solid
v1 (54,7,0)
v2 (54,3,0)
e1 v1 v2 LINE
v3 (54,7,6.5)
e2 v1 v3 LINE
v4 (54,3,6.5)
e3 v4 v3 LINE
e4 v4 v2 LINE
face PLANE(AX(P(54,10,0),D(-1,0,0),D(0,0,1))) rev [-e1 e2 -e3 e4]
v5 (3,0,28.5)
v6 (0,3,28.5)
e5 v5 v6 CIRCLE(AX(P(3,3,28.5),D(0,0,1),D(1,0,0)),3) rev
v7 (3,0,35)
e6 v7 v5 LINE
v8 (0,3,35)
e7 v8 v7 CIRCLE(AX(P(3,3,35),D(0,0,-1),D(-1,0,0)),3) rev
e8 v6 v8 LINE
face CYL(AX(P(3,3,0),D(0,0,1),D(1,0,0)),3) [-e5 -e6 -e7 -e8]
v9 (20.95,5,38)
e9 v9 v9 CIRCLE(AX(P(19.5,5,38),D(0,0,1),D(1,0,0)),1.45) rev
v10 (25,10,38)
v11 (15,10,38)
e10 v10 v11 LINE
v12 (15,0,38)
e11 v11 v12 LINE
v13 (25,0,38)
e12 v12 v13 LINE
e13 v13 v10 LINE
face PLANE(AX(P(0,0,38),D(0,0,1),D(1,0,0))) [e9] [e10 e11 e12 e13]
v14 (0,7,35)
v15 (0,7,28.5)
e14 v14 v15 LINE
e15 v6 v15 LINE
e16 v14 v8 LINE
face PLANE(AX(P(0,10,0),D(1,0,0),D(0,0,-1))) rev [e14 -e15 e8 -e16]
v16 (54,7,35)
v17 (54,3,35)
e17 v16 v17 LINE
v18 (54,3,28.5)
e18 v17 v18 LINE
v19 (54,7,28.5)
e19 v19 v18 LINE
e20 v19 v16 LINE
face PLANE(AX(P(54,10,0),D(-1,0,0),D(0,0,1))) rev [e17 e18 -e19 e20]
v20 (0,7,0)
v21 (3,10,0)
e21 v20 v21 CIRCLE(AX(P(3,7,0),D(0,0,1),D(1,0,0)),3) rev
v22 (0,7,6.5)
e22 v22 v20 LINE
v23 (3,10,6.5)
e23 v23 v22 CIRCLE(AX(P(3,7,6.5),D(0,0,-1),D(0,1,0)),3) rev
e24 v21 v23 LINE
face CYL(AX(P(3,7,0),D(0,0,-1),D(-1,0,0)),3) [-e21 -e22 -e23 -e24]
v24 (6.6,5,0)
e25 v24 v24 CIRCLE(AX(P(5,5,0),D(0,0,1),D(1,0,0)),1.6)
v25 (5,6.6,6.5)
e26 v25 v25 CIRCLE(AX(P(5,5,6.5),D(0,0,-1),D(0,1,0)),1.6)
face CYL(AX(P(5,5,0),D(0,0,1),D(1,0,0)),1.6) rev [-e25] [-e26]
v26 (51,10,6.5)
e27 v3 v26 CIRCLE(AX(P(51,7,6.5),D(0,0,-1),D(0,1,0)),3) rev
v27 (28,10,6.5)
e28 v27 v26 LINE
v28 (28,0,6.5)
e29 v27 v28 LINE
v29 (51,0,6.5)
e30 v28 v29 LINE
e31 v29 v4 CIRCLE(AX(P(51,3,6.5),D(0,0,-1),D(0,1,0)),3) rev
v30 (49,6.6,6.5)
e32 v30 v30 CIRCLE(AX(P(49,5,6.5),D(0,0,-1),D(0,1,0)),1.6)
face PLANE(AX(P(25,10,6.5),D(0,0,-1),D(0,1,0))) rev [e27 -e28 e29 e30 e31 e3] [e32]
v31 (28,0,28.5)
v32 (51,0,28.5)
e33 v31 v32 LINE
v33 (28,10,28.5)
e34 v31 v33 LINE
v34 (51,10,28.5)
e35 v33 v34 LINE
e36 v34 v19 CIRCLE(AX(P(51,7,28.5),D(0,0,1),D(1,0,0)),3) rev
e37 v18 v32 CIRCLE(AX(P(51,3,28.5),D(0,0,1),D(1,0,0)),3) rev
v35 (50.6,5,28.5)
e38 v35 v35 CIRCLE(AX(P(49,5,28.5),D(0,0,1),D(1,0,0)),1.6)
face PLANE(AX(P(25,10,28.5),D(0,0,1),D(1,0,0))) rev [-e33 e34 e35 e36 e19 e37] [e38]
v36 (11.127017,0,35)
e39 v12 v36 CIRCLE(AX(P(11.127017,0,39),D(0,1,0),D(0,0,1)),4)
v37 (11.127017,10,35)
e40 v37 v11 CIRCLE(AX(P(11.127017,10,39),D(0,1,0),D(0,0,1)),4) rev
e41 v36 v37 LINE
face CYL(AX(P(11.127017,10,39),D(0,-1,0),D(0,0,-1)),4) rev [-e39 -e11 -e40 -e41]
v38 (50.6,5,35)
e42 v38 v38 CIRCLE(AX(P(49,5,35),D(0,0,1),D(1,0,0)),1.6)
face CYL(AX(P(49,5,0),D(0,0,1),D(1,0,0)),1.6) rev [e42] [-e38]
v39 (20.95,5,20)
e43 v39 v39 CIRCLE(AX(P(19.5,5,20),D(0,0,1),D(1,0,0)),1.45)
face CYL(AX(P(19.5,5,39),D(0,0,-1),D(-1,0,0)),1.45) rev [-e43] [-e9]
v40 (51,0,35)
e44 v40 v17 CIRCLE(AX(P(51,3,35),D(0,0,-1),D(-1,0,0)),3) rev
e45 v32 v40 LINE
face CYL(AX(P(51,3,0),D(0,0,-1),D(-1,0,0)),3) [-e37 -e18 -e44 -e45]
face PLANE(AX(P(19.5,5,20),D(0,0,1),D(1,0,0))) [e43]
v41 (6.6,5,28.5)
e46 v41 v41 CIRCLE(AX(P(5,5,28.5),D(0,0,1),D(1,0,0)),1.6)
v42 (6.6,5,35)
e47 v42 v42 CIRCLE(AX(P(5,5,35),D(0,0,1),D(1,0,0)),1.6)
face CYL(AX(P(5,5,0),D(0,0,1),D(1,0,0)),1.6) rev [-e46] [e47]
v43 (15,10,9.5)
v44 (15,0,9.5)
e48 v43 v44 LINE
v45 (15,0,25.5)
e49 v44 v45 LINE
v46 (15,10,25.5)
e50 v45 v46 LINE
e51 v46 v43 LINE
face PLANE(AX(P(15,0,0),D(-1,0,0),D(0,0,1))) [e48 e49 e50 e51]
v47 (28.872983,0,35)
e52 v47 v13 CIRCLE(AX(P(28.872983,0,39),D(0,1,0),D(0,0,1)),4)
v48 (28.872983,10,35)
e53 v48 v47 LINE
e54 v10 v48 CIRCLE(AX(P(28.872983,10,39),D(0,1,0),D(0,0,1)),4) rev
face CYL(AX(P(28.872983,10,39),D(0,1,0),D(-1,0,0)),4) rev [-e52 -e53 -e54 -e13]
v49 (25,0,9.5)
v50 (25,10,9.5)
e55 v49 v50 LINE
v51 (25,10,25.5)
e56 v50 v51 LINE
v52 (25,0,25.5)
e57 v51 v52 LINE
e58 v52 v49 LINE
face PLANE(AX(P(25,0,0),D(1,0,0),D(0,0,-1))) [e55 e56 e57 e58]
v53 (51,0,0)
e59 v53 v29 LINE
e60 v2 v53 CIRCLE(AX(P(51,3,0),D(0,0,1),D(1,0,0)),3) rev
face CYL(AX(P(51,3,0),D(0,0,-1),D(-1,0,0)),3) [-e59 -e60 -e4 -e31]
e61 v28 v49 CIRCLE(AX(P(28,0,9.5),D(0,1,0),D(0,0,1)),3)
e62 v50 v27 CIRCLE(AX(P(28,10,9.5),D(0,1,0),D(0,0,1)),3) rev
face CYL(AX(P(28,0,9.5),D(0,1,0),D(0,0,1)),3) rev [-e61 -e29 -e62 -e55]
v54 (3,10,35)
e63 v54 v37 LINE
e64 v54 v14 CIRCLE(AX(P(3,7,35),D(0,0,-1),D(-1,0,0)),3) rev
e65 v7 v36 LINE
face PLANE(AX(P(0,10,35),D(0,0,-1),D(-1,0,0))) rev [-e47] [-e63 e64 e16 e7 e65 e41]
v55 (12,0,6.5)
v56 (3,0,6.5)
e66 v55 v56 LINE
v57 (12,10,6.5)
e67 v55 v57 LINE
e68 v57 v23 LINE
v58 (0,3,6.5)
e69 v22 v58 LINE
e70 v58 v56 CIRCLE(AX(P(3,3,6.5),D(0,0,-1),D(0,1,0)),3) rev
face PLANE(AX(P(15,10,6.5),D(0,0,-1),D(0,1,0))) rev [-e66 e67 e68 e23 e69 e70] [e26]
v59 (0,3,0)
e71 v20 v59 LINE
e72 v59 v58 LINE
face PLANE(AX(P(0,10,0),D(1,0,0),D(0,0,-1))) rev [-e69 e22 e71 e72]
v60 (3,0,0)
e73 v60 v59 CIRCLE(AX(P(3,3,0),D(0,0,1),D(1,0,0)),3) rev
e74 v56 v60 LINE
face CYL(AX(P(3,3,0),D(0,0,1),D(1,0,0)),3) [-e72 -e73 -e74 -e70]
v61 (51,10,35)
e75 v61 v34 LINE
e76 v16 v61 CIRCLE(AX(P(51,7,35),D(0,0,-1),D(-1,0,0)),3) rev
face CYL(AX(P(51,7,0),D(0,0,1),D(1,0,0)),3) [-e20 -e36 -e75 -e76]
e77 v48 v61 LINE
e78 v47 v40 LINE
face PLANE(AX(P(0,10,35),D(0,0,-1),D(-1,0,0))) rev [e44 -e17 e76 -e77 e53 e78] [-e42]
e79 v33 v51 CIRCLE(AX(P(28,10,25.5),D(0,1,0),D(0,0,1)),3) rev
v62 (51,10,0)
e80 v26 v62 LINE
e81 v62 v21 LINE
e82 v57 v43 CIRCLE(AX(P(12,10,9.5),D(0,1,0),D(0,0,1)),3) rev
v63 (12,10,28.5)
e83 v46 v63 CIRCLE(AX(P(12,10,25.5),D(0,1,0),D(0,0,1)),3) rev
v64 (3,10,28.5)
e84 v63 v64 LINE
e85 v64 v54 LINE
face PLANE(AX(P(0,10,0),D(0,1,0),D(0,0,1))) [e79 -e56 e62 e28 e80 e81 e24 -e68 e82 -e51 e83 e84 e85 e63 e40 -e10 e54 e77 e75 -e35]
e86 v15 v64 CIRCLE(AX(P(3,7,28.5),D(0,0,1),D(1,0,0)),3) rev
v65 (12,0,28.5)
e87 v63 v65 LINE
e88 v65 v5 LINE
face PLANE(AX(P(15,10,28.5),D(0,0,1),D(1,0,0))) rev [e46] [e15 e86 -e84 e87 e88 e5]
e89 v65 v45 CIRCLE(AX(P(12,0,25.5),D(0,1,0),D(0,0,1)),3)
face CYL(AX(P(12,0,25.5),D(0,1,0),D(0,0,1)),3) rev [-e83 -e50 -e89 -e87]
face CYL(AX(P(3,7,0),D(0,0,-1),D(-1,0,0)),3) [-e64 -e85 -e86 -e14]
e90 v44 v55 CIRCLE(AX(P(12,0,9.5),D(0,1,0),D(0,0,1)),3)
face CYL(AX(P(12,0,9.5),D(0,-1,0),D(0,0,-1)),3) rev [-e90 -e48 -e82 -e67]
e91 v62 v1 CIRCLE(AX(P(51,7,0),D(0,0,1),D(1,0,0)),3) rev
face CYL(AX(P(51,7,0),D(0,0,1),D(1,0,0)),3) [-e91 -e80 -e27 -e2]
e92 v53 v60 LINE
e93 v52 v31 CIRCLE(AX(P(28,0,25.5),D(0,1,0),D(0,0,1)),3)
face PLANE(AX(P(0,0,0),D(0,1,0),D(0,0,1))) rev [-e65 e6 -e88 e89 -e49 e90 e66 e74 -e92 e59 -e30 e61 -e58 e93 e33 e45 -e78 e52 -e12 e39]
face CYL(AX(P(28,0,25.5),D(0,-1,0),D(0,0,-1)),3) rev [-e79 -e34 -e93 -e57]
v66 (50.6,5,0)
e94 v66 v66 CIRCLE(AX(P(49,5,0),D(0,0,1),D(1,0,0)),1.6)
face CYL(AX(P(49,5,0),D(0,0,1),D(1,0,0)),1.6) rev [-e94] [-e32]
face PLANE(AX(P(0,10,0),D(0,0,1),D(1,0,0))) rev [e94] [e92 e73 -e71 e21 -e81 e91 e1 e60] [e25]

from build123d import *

# Parameters (mm, degrees)
SKETCH1_W               = 54
SKETCH1_H               = 35
BOSS_EXTRUDE1_DEPTH     = 10
SKETCH2_W               = 22
SKETCH2_H               = 10
CUT_EXTRUDE1_DEPTH      = 29
SKETCH3_W               = 22
SKETCH3_H               = 10
CUT_EXTRUDE2_DEPTH      = 15
SKETCH5_R               = 1.6
CUT_EXTRUDE4_DEPTH      = 66.122960621
FILLET1_R               = 3
FILLET2_R               = 3
SKETCH8_W               = 10
SKETCH8_H               = 10
BOSS_EXTRUDE2_DEPTH     = 3
CUT_EXTRUDE5_DEPTH      = 4
CUT_EXTRUDE5_DEPTH_BACK = 15
SKETCH6_R               = 1.45
FILLET3_R               = 4


with BuildPart() as part:
    # Sketch1 → Boss-Extrude1 (new body)
    with BuildSketch(Plane(origin=(0, 0, 0), x_dir=(1, 0, 0), z_dir=(0, 1, 0))):
        with Locations((27, -17.5)):
            Rectangle(SKETCH1_W, SKETCH1_H)
    extrude(amount=BOSS_EXTRUDE1_DEPTH)

    # Sketch2 → Cut-Extrude1 (cut)
    with BuildSketch(Plane(origin=(54, 0, 0), x_dir=(0, 0, -1), z_dir=(1, 0, 0))):
        with Locations((-17.5, 5)):
            Rectangle(SKETCH2_W, SKETCH2_H)
    extrude(amount=-CUT_EXTRUDE1_DEPTH, mode=Mode.SUBTRACT)

    # Sketch3 → Cut-Extrude2 (cut)
    with BuildSketch(Plane.ZY):
        with Locations((17.5, 5)):
            Rectangle(SKETCH3_W, SKETCH3_H)
    extrude(amount=-CUT_EXTRUDE2_DEPTH, mode=Mode.SUBTRACT)

    # Sketch5 → Cut-Extrude4 (cut, through all)
    with BuildSketch(Plane.XY.offset(35)):
        with Locations((5, 5)):
            Circle(SKETCH5_R)
        with Locations((49, 5)):
            Circle(SKETCH5_R)
    extrude(amount=-CUT_EXTRUDE4_DEPTH, mode=Mode.SUBTRACT)

    # Fillet1
    fillet1_edges = [part.edges().sort_by_distance(p)[0] for p in [
        (54, 10, 31.75),
        (54, 0, 3.25),
        (54, 10, 3.25),
        (0, 0, 31.75),
        (0, 10, 31.75),
        (0, 10, 3.25),
        (54, 0, 31.75),
        (0, 0, 3.25),
    ]]
    fillet(fillet1_edges, radius=FILLET1_R)

    # Fillet2
    fillet2_edges = [part.edges().sort_by_distance(p)[0] for p in [
        (25, 5, 28.5),
        (25, 5, 6.5),
        (15, 5, 6.5),
        (15, 5, 28.5),
    ]]
    fillet(fillet2_edges, radius=FILLET2_R)

    # Sketch8 → Boss-Extrude2 (add)
    with BuildSketch(Plane.XY.offset(35)):
        with Locations((20, 5)):
            Rectangle(SKETCH8_W, SKETCH8_H)
    extrude(amount=BOSS_EXTRUDE2_DEPTH)

    # Sketch6 → Cut-Extrude5 (cut, two sides: drawn at the far end of the back side and taken through both)
    with BuildSketch(Plane.XY.offset(35).offset(-CUT_EXTRUDE5_DEPTH_BACK)):
        with Locations((19.5, 5)):
            Circle(SKETCH6_R)
    extrude(amount=CUT_EXTRUDE5_DEPTH + CUT_EXTRUDE5_DEPTH_BACK, mode=Mode.SUBTRACT)

    # Fillet3
    # the kernel refuses this fillet: 4 mm, written as the material it adds along each edge
    with BuildSketch(Plane(origin=(25, 10, 35), x_dir=(0, 0, 1), z_dir=(0, -1, 0))) as fillet3_piece_1:
        with BuildLine():
            CenterArc((4, -3.872983346), FILLET3_R, 104.477512186, 75.522487814)
            Line((0, -3.872983346), (-0.08, -3.872983346))
            Line((-0.08, -3.872983346), (-0.08, 0))
            Line((-0.08, 0), (0, 0.08))
            ThreePointArc((0, 0.08), (1.5, 0.08), (2.98, 0.077459667))
            Line((2.98, 0.077459667), (3, 0))
        make_face()
    extrude(amount=10)
    with BuildSketch(Plane(origin=(15, 0, 35), x_dir=(-1, 0, 0), z_dir=(0, 1, 0))) as fillet3_piece_2:
        with BuildLine():
            CenterArc((3.872983346, 4), FILLET3_R, 194.477512186, 75.522487814)
            Line((0, 3), (-0.077459667, 2.98))
            ThreePointArc((-0.077459667, 2.98), (-0.08, 1.5), (-0.08, 0))
            Line((-0.08, 0), (0, -0.08))
            Line((0, -0.08), (3.872983346, -0.08))
            Line((3.872983346, -0.08), (3.872983346, 0))
        make_face()
    extrude(amount=10)


solid = part.part
